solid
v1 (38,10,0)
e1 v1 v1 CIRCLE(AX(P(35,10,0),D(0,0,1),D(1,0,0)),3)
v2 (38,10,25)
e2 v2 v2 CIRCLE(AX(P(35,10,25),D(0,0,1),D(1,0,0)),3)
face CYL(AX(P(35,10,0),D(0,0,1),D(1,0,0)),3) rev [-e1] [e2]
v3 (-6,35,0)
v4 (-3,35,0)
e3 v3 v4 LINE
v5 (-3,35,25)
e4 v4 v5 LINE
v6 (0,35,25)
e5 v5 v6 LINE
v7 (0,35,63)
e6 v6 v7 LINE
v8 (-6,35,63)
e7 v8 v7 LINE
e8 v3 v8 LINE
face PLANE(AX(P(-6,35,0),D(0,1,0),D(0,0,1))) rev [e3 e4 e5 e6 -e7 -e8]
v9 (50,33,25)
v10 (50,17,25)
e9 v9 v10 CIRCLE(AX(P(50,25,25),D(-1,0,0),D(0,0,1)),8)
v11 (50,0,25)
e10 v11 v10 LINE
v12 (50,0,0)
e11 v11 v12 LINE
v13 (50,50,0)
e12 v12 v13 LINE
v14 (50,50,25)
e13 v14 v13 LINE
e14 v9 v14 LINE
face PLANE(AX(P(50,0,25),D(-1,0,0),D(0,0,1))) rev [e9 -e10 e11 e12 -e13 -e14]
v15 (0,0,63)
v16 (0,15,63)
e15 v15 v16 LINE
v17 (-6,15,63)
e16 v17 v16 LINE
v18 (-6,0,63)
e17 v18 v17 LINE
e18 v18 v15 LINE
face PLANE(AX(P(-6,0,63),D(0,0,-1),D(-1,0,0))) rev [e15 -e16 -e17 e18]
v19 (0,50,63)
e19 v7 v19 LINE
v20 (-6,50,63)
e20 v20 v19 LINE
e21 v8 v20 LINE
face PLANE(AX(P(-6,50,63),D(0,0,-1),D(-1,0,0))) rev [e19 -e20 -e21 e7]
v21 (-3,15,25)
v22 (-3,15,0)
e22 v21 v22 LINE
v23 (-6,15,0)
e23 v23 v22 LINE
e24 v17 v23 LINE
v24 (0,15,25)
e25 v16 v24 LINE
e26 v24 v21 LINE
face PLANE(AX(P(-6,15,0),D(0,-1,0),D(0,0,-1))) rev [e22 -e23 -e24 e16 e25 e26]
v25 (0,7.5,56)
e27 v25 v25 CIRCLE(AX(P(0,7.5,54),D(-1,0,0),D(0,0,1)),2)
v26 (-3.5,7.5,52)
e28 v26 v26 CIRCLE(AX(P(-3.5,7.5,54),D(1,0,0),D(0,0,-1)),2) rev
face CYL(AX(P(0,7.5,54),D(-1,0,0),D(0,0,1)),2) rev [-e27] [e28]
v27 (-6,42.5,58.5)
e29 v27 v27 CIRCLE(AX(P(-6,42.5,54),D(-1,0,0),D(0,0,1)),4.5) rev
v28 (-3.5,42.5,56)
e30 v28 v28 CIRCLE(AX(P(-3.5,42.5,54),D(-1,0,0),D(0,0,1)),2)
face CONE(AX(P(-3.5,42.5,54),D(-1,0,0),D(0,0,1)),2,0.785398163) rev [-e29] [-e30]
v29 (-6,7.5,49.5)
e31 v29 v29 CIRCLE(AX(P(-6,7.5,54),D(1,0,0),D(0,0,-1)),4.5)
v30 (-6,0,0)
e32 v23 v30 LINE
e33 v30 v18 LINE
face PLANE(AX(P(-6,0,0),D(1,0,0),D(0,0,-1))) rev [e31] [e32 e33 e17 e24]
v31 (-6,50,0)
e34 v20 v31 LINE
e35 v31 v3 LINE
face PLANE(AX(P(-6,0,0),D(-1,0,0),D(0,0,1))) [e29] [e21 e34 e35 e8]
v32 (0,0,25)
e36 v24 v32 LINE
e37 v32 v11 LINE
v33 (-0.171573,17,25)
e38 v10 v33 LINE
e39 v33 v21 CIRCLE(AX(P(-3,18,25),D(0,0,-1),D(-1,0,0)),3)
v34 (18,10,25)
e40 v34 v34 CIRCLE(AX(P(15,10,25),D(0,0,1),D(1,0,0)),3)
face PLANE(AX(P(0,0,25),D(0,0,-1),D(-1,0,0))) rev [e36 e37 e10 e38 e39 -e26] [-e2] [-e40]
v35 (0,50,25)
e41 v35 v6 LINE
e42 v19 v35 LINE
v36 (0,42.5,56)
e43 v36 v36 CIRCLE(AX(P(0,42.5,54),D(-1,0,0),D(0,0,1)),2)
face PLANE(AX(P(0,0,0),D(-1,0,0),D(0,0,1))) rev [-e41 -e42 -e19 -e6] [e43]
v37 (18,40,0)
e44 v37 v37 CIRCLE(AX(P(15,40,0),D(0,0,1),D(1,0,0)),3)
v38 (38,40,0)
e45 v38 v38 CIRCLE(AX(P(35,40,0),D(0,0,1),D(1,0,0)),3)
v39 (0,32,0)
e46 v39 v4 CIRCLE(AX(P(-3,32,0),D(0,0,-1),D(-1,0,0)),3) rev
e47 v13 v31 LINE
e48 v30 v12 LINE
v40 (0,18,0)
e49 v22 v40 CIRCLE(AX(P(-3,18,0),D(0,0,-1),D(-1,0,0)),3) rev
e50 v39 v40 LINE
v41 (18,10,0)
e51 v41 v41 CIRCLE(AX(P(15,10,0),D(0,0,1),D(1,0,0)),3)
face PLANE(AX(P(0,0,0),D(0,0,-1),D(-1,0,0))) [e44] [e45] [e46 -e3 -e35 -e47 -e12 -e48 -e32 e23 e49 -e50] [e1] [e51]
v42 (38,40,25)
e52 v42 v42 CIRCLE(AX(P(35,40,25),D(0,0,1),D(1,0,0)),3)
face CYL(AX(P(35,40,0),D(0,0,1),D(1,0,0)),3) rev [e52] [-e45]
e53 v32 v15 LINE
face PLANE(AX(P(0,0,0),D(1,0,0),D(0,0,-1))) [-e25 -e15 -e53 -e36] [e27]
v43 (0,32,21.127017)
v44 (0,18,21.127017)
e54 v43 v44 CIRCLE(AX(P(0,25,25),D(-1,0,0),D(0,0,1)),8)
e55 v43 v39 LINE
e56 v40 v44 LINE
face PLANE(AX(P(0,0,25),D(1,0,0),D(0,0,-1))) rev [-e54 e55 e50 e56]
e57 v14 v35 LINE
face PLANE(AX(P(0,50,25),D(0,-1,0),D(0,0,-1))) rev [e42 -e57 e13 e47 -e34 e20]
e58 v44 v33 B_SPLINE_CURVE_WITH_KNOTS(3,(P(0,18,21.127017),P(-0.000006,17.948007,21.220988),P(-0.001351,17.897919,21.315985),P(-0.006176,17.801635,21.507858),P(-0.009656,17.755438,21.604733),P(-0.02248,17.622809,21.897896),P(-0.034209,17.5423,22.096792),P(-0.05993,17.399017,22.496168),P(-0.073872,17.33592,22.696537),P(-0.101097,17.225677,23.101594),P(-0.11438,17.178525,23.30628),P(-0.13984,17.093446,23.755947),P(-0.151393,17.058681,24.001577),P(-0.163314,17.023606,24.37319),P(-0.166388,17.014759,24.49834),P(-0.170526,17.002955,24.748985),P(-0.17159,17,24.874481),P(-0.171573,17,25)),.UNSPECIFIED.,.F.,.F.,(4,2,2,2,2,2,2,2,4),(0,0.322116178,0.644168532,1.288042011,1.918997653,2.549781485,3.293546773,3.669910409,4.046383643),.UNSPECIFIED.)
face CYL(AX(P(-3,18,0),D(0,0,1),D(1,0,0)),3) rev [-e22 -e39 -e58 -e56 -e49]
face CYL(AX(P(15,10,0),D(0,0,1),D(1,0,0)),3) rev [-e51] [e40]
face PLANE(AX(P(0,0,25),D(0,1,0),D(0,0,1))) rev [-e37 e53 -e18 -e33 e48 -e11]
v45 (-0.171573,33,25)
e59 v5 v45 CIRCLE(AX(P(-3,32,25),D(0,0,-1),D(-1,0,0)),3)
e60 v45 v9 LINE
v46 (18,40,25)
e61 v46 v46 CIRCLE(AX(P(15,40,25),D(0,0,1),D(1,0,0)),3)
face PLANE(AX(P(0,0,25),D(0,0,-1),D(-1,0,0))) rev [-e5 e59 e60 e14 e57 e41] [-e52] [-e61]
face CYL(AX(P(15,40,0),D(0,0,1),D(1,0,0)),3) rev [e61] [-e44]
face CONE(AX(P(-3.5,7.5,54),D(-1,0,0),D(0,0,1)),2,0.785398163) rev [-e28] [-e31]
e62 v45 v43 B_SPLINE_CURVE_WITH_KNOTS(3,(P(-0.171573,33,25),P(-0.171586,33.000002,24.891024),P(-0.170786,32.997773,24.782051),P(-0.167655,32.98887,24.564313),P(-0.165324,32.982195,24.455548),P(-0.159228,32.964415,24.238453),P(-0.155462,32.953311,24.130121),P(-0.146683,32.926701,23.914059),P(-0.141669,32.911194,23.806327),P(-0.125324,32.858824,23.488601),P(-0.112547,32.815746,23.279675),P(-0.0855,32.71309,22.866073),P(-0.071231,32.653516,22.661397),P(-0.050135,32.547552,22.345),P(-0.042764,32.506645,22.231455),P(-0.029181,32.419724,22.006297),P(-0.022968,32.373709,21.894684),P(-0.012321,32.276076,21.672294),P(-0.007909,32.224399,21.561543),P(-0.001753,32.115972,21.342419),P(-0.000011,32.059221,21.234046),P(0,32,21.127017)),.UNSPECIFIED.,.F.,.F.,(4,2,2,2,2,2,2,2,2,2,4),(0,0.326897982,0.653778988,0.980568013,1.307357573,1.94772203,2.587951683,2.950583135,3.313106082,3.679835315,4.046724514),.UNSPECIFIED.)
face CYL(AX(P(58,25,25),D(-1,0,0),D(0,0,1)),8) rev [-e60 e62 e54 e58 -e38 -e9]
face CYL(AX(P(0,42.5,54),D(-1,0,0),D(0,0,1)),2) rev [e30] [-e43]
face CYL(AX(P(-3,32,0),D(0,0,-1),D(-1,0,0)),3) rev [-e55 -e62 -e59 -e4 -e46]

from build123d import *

# Parameters (mm, degrees)
SKETCH1_W           = 50
SKETCH1_H           = 50
BOSS_EXTRUDE1_DEPTH = 25
SKETCH2_R           = 8
CUT_EXTRUDE1_DEPTH  = 58
SKETCH3_R           = 3
CUT_EXTRUDE2_DEPTH  = 25
SKETCH4_W           = 63
SKETCH4_H           = 15
BOSS_EXTRUDE2_DEPTH = 6
SKETCH5_R           = 2
CUT_EXTRUDE3_DEPTH  = 6
CHAMFER1_SIZE       = 2.5
FILLET1_R           = 3


with BuildPart() as part:
    # Sketch1 → Boss-Extrude1 (new body)
    with BuildSketch(Plane.XY):
        with Locations((25, 25)):
            Rectangle(SKETCH1_W, SKETCH1_H)
    extrude(amount=BOSS_EXTRUDE1_DEPTH)

    # Sketch2 → Cut-Extrude1 (cut)
    with BuildSketch(Plane.ZY):
        with Locations((25, 25)):
            Circle(SKETCH2_R)
    extrude(amount=-CUT_EXTRUDE1_DEPTH, mode=Mode.SUBTRACT)

    # Sketch3 → Cut-Extrude2 (cut)
    with BuildSketch(Plane.XY.offset(25)):
        with Locations((15, 40)):
            Circle(SKETCH3_R)
        with Locations((35, 40)):
            Circle(SKETCH3_R)
        with Locations((35, 10)):
            Circle(SKETCH3_R)
        with Locations((15, 10)):
            Circle(SKETCH3_R)
    extrude(amount=-CUT_EXTRUDE2_DEPTH, mode=Mode.SUBTRACT)

    # Sketch4 → Boss-Extrude2 (add)
    with BuildSketch(Plane.ZY):
        with Locations((31.5, 42.5)):
            Rectangle(SKETCH4_W, SKETCH4_H)
        with Locations((31.5, 7.5)):
            Rectangle(SKETCH4_W, SKETCH4_H)
    extrude(amount=BOSS_EXTRUDE2_DEPTH)

    # Sketch5 → Cut-Extrude3 (cut)
    with BuildSketch(Plane.ZY.offset(6)):
        with Locations((54, 42.5)):
            Circle(SKETCH5_R)
        with Locations((54, 7.5)):
            Circle(SKETCH5_R)
    extrude(amount=-CUT_EXTRUDE3_DEPTH, mode=Mode.SUBTRACT)

    # Chamfer1
    chamfer1_edges = [part.edges().sort_by_distance(p)[0] for p in [
        (-6, 42.5, 52),
        (-6, 7.5, 52),
    ]]
    chamfer(chamfer1_edges, length=CHAMFER1_SIZE)

    # Fillet1
    # the kernel refuses this fillet: 3 mm, written as the material it adds along each edge
    with BuildSketch(Plane(origin=(0, 15, 25), x_dir=(-1, 0, 0), z_dir=(0, 0, -1))) as fillet1_piece_1_section:
        with BuildLine():
            CenterArc((FILLET1_R, FILLET1_R), FILLET1_R, 180, 90)
            Line((0, FILLET1_R), (0, 0))
            Line((0, 0), (FILLET1_R, 0))
        make_face()
    fillet1_piece_1 = extrude(amount=25, mode=Mode.PRIVATE)
    fillet1_piece_1 = fillet1_piece_1 - Plane(origin=(-0.671433756, 25, 25), x_dir=(0, 0, 1), z_dir=(-1, 0, 0)) * Cylinder(8, 62, mode=Mode.PRIVATE)
    add(fillet1_piece_1)
    with BuildSketch(Plane(origin=(0, 35, 25), x_dir=(-1, 0, 0), z_dir=(0, 0, -1))) as fillet1_piece_2_section:
        with BuildLine():
            CenterArc((FILLET1_R, -FILLET1_R), FILLET1_R, 90, 90)
            Line((0, -FILLET1_R), (0, 0))
            Line((0, 0), (FILLET1_R, 0))
        make_face()
    fillet1_piece_2 = extrude(amount=25, mode=Mode.PRIVATE)
    fillet1_piece_2 = fillet1_piece_2 - Plane(origin=(-0.671433756, 25, 25), x_dir=(0, 0, 1), z_dir=(-1, 0, 0)) * Cylinder(8, 62, mode=Mode.PRIVATE)
    add(fillet1_piece_2)


solid = part.part
